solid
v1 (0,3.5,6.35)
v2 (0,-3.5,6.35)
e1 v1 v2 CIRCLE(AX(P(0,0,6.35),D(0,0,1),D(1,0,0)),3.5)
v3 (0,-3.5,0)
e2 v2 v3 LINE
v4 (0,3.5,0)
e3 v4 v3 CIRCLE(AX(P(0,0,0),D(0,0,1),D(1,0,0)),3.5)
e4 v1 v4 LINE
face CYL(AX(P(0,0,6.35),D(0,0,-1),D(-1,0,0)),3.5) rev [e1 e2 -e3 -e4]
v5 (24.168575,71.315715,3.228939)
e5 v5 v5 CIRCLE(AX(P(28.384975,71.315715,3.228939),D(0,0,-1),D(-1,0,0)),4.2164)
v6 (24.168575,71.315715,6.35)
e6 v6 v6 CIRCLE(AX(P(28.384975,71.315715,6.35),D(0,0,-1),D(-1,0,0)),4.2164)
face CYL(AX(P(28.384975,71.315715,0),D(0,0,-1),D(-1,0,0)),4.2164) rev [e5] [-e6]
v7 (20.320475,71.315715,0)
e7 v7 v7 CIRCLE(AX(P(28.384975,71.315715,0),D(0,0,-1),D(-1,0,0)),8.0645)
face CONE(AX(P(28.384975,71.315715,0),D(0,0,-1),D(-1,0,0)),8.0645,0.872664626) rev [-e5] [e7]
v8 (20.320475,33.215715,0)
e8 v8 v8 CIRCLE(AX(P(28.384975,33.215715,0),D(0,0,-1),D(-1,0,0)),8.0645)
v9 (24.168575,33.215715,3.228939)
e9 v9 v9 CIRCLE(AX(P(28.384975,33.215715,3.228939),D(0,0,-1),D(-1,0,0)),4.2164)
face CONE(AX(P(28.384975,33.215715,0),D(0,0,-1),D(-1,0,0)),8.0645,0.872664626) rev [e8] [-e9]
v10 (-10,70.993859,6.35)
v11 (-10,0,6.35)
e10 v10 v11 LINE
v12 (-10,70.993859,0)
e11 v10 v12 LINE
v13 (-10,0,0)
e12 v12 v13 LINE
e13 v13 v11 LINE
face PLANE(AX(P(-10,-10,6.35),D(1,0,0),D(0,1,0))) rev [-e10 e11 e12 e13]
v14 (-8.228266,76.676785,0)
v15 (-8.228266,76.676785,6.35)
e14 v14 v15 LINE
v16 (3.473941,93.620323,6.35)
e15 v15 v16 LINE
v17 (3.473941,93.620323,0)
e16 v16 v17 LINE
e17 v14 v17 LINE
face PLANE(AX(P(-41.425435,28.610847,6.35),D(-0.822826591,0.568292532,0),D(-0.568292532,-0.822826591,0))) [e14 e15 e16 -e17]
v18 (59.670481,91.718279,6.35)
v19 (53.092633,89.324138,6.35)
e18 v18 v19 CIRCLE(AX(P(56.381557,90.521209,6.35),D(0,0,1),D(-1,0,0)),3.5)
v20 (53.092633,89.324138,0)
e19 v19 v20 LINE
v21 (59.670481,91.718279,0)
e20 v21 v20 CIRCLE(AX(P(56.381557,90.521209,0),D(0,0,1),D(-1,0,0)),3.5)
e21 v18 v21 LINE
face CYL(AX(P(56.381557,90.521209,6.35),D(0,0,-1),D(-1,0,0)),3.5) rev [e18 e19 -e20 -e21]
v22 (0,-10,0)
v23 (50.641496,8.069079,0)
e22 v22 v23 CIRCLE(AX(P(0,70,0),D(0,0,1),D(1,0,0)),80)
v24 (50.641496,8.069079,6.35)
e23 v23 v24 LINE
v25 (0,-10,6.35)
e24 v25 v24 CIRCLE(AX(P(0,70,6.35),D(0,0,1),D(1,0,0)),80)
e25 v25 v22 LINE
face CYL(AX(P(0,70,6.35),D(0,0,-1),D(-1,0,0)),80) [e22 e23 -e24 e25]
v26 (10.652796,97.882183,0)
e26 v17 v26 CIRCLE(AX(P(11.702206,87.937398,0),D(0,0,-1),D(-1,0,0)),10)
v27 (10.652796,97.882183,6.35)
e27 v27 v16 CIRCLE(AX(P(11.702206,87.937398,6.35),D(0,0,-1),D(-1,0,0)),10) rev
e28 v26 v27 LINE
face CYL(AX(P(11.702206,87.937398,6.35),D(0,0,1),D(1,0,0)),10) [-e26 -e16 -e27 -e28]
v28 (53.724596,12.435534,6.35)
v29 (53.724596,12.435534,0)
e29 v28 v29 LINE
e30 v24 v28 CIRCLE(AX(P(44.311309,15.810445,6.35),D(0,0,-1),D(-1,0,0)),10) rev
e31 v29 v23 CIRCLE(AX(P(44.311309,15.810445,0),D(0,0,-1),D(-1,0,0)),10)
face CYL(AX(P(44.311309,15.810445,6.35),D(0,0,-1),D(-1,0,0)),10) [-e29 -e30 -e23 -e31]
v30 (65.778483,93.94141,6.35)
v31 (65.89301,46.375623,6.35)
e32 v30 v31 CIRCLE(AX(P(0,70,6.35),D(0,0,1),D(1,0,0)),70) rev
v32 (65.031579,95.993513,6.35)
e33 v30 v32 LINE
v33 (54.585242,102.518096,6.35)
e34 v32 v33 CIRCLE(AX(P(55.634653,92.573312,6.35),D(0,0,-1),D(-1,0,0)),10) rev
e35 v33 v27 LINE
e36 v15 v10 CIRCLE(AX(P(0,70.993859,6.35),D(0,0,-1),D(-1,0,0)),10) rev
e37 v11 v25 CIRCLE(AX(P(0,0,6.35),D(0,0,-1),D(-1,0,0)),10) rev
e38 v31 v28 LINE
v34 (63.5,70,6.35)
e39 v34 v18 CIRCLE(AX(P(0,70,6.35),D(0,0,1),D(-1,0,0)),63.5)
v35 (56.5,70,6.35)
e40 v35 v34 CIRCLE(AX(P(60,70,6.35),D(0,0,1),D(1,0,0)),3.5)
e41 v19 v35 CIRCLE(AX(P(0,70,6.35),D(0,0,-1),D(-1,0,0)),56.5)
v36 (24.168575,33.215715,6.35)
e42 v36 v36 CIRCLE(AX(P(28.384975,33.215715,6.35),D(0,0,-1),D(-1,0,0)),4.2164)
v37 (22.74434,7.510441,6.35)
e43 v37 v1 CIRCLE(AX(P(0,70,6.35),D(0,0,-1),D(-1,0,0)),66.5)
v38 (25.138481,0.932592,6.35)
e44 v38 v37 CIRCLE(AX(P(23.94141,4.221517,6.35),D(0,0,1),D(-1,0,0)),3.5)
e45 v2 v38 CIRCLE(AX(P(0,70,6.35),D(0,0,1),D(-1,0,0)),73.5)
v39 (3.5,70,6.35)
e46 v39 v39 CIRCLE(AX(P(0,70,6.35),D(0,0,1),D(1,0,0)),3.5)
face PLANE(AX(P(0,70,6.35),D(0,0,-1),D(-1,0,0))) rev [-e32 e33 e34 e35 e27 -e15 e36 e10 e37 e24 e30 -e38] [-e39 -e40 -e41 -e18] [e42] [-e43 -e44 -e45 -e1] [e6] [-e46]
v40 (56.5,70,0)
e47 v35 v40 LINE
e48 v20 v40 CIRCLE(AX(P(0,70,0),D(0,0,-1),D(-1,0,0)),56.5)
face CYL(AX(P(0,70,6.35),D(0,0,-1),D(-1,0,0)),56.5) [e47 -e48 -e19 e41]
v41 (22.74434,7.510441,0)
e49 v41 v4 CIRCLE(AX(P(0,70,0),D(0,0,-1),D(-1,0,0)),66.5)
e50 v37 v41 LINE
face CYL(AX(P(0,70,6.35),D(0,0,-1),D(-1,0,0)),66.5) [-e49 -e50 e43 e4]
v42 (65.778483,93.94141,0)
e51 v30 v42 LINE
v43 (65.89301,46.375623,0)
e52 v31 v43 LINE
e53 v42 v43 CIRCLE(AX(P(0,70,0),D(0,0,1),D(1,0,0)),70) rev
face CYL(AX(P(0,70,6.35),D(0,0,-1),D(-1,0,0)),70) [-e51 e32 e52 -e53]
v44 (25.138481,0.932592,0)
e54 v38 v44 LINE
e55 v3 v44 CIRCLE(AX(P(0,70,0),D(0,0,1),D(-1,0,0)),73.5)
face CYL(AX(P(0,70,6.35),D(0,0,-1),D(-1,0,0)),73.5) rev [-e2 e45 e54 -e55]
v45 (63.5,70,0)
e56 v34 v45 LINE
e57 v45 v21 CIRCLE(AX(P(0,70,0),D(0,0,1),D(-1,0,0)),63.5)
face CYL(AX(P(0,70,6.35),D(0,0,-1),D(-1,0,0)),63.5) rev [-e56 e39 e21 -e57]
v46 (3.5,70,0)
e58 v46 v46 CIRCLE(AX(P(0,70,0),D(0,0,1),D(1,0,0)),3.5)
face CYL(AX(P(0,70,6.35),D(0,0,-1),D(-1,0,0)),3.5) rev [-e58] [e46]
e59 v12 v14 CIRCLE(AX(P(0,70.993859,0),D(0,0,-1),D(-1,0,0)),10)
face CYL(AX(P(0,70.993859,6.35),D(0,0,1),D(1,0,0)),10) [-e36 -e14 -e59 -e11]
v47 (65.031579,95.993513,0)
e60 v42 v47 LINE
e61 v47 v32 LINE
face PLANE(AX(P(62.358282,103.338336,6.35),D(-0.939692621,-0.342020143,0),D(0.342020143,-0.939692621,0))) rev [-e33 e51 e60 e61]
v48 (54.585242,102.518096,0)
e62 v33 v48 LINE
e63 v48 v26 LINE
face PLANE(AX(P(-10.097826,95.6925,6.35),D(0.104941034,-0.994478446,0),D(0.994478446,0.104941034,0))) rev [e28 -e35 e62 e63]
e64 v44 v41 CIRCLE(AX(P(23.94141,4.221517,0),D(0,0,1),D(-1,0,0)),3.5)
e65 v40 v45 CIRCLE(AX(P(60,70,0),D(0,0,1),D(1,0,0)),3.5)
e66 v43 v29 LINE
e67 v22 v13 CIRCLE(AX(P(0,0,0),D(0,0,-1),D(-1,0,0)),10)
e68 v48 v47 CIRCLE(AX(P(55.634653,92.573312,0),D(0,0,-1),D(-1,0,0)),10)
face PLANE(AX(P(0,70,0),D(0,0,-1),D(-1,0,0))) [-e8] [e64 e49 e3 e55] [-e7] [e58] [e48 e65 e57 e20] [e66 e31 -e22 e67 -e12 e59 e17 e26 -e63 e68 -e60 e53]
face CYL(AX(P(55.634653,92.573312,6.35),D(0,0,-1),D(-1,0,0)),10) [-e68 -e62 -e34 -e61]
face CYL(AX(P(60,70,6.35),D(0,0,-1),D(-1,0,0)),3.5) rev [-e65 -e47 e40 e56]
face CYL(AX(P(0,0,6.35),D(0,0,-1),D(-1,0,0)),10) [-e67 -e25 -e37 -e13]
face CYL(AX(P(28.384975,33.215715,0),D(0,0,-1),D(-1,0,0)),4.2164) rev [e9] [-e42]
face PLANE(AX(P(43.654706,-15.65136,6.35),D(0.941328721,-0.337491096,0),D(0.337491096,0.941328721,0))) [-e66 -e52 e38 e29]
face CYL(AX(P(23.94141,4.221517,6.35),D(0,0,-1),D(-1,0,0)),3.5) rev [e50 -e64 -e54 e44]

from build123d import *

# Parameters (mm, degrees)
BOSS_EXTRUDE1_DEPTH                          = 6.35
SKETCH3_R                                    = 3.5
CUT_EXTRUDE2_DEPTH                           = 139.002460895
SKETCH4_OUTSIDE_W                            = 133.666
SKETCH4_OUTSIDE_H                            = 145.76
CUT_EXTRUDE3_DEPTH                           = 139.002460895
FILLET1_R                                    = 10
CSK_FOR_5_16_FLAT_HEAD_MACHINE_SCREW_2_COUNT = 2
CSK_FOR_5_16_FLAT_HEAD_MACHINE_SCREW_2_PITCH = 38.1


with BuildPart() as part:
    # Sketch2 → Boss-Extrude1 (new body)
    with BuildSketch(Plane.XY):
        with BuildLine():
            Line((-10, -10), (-10, 103.338336241))
            Line((-10, 103.338336241), (62.358282022, 103.338336241))
            Line((62.358282022, 103.338336241), (91.244424357, 23.974312441))
            ThreePointArc((91.244424357, 23.974312441), (79.259842401, 5.488091998), (63.591736031, -10))
            Line((63.591736031, -10), (-10, -10))
        make_face()
    extrude(amount=BOSS_EXTRUDE1_DEPTH)

    # Sketch3 → Cut-Extrude2 (cut, through all)
    with BuildSketch(Plane.XY):
        with Locations((0, 70)):
            Circle(SKETCH3_R)
        with BuildLine():
            ThreePointArc((53.092633074, 89.324138098), (55.641638045, 79.811122038), (56.5, 70))
            ThreePointArc((56.5, 70), (60, 66.5), (63.5, 70))
            ThreePointArc((63.5, 70), (62.535292316, 81.026659282), (59.67048142, 91.718279101))
            ThreePointArc((59.67048142, 91.718279101), (55.184486746, 93.810132772), (53.092633074, 89.324138098))
        make_face()
        with BuildLine():
            ThreePointArc((77.273680119, 26.460819381), (68.539219913, 13.703843633), (57.722230193, 2.657398108))
            ThreePointArc((57.722230193, 2.657398108), (57.342601892, -2.277769807), (62.277769807, -2.657398108))
            ThreePointArc((62.277769807, -2.657398108), (73.948455322, 9.260852265), (83.372254441, 23.024630908))
            ThreePointArc((83.372254441, 23.024630908), (82.041061517, 27.792012306), (77.273680119, 26.460819381))
        make_face()
        with BuildLine():
            ThreePointArc((22.744339531, 7.510440718), (11.547603815, 4.510284425), (0, 3.5))
            ThreePointArc((0, 3.5), (-3.5, 0), (0, -3.5))
            ThreePointArc((0, -3.5), (12.763141059, -2.383369846), (25.138480534, 0.932592372))
            ThreePointArc((25.138480534, 0.932592372), (27.230334206, 5.418587047), (22.744339531, 7.510440718))
        make_face()
    extrude(amount=CUT_EXTRUDE2_DEPTH, mode=Mode.SUBTRACT)

    # Sketch4 outside → Cut-Extrude3 (cut, through all)
    with BuildSketch(Plane.XY):
        with Locations((40.622, 46.669)):
            Rectangle(SKETCH4_OUTSIDE_W, SKETCH4_OUTSIDE_H)
        with BuildLine():
            Line((65.893010444, 46.375623296), (52.822036509, 9.918118713))
            ThreePointArc((52.822036509, 9.918118713), (28.226313052, -4.855028231), (0, -10))
            Line((0, -10), (-10, -10))
            Line((-10, -10), (-10, 74.111503744))
            Line((-10, 74.111503744), (6.084489401, 97.400118036))
            Line((6.084489401, 97.400118036), (62.358282022, 103.338336241))
            Line((62.358282022, 103.338336241), (65.778483455, 93.941410033))
            ThreePointArc((65.778483455, 93.941410033), (69.999797095, 70.168542697), (65.893010444, 46.375623296))
        make_face(mode=Mode.SUBTRACT)
    extrude(amount=CUT_EXTRUDE3_DEPTH, mode=Mode.SUBTRACT)

    # Fillet1
    fillet1_edges = [part.edges().sort_by_distance(p)[0] for p in [
        (52.822036509, 9.918118713, 3.175),
        (-10, -10, 3.175),
        (-10, 74.111503744, 3.175),
        (62.358282022, 103.338336241, 3.175),
        (6.084489401, 97.400118036, 3.175),
    ]]
    fillet(fillet1_edges, radius=FILLET1_R - 0.0001)  # a hair under: the kernel refuses the full size

    # Sketch9 → CSK for 5_16 Flat Head Machine Screw _10 (revolve, cut)
    with BuildSketch(Plane(origin=(28.384975395, 71.315714753, 0), x_dir=(0, 1, 0), z_dir=(1, 0, 0))):
        Polygon((0, 0), (0, 6.35), (4.2164, 6.35), (4.2164, 3.228939291), (8.0645, 0), align=None)
    csk_for_5_16_flat_head_machine_screw_10 = revolve(axis=Axis((28.384975395, 71.315714753, -6.35), (0, 0, 1)), mode=Mode.SUBTRACT)

    # CSK for 5_16 Flat Head Machine Screw 2: CSK for 5_16 Flat Head Machine Screw _10 ×2
    with Locations(*[(0, -i * CSK_FOR_5_16_FLAT_HEAD_MACHINE_SCREW_2_PITCH, 0) for i in range(1, CSK_FOR_5_16_FLAT_HEAD_MACHINE_SCREW_2_COUNT)]):
        add(csk_for_5_16_flat_head_machine_screw_10, mode=Mode.SUBTRACT)


solid = part.part
